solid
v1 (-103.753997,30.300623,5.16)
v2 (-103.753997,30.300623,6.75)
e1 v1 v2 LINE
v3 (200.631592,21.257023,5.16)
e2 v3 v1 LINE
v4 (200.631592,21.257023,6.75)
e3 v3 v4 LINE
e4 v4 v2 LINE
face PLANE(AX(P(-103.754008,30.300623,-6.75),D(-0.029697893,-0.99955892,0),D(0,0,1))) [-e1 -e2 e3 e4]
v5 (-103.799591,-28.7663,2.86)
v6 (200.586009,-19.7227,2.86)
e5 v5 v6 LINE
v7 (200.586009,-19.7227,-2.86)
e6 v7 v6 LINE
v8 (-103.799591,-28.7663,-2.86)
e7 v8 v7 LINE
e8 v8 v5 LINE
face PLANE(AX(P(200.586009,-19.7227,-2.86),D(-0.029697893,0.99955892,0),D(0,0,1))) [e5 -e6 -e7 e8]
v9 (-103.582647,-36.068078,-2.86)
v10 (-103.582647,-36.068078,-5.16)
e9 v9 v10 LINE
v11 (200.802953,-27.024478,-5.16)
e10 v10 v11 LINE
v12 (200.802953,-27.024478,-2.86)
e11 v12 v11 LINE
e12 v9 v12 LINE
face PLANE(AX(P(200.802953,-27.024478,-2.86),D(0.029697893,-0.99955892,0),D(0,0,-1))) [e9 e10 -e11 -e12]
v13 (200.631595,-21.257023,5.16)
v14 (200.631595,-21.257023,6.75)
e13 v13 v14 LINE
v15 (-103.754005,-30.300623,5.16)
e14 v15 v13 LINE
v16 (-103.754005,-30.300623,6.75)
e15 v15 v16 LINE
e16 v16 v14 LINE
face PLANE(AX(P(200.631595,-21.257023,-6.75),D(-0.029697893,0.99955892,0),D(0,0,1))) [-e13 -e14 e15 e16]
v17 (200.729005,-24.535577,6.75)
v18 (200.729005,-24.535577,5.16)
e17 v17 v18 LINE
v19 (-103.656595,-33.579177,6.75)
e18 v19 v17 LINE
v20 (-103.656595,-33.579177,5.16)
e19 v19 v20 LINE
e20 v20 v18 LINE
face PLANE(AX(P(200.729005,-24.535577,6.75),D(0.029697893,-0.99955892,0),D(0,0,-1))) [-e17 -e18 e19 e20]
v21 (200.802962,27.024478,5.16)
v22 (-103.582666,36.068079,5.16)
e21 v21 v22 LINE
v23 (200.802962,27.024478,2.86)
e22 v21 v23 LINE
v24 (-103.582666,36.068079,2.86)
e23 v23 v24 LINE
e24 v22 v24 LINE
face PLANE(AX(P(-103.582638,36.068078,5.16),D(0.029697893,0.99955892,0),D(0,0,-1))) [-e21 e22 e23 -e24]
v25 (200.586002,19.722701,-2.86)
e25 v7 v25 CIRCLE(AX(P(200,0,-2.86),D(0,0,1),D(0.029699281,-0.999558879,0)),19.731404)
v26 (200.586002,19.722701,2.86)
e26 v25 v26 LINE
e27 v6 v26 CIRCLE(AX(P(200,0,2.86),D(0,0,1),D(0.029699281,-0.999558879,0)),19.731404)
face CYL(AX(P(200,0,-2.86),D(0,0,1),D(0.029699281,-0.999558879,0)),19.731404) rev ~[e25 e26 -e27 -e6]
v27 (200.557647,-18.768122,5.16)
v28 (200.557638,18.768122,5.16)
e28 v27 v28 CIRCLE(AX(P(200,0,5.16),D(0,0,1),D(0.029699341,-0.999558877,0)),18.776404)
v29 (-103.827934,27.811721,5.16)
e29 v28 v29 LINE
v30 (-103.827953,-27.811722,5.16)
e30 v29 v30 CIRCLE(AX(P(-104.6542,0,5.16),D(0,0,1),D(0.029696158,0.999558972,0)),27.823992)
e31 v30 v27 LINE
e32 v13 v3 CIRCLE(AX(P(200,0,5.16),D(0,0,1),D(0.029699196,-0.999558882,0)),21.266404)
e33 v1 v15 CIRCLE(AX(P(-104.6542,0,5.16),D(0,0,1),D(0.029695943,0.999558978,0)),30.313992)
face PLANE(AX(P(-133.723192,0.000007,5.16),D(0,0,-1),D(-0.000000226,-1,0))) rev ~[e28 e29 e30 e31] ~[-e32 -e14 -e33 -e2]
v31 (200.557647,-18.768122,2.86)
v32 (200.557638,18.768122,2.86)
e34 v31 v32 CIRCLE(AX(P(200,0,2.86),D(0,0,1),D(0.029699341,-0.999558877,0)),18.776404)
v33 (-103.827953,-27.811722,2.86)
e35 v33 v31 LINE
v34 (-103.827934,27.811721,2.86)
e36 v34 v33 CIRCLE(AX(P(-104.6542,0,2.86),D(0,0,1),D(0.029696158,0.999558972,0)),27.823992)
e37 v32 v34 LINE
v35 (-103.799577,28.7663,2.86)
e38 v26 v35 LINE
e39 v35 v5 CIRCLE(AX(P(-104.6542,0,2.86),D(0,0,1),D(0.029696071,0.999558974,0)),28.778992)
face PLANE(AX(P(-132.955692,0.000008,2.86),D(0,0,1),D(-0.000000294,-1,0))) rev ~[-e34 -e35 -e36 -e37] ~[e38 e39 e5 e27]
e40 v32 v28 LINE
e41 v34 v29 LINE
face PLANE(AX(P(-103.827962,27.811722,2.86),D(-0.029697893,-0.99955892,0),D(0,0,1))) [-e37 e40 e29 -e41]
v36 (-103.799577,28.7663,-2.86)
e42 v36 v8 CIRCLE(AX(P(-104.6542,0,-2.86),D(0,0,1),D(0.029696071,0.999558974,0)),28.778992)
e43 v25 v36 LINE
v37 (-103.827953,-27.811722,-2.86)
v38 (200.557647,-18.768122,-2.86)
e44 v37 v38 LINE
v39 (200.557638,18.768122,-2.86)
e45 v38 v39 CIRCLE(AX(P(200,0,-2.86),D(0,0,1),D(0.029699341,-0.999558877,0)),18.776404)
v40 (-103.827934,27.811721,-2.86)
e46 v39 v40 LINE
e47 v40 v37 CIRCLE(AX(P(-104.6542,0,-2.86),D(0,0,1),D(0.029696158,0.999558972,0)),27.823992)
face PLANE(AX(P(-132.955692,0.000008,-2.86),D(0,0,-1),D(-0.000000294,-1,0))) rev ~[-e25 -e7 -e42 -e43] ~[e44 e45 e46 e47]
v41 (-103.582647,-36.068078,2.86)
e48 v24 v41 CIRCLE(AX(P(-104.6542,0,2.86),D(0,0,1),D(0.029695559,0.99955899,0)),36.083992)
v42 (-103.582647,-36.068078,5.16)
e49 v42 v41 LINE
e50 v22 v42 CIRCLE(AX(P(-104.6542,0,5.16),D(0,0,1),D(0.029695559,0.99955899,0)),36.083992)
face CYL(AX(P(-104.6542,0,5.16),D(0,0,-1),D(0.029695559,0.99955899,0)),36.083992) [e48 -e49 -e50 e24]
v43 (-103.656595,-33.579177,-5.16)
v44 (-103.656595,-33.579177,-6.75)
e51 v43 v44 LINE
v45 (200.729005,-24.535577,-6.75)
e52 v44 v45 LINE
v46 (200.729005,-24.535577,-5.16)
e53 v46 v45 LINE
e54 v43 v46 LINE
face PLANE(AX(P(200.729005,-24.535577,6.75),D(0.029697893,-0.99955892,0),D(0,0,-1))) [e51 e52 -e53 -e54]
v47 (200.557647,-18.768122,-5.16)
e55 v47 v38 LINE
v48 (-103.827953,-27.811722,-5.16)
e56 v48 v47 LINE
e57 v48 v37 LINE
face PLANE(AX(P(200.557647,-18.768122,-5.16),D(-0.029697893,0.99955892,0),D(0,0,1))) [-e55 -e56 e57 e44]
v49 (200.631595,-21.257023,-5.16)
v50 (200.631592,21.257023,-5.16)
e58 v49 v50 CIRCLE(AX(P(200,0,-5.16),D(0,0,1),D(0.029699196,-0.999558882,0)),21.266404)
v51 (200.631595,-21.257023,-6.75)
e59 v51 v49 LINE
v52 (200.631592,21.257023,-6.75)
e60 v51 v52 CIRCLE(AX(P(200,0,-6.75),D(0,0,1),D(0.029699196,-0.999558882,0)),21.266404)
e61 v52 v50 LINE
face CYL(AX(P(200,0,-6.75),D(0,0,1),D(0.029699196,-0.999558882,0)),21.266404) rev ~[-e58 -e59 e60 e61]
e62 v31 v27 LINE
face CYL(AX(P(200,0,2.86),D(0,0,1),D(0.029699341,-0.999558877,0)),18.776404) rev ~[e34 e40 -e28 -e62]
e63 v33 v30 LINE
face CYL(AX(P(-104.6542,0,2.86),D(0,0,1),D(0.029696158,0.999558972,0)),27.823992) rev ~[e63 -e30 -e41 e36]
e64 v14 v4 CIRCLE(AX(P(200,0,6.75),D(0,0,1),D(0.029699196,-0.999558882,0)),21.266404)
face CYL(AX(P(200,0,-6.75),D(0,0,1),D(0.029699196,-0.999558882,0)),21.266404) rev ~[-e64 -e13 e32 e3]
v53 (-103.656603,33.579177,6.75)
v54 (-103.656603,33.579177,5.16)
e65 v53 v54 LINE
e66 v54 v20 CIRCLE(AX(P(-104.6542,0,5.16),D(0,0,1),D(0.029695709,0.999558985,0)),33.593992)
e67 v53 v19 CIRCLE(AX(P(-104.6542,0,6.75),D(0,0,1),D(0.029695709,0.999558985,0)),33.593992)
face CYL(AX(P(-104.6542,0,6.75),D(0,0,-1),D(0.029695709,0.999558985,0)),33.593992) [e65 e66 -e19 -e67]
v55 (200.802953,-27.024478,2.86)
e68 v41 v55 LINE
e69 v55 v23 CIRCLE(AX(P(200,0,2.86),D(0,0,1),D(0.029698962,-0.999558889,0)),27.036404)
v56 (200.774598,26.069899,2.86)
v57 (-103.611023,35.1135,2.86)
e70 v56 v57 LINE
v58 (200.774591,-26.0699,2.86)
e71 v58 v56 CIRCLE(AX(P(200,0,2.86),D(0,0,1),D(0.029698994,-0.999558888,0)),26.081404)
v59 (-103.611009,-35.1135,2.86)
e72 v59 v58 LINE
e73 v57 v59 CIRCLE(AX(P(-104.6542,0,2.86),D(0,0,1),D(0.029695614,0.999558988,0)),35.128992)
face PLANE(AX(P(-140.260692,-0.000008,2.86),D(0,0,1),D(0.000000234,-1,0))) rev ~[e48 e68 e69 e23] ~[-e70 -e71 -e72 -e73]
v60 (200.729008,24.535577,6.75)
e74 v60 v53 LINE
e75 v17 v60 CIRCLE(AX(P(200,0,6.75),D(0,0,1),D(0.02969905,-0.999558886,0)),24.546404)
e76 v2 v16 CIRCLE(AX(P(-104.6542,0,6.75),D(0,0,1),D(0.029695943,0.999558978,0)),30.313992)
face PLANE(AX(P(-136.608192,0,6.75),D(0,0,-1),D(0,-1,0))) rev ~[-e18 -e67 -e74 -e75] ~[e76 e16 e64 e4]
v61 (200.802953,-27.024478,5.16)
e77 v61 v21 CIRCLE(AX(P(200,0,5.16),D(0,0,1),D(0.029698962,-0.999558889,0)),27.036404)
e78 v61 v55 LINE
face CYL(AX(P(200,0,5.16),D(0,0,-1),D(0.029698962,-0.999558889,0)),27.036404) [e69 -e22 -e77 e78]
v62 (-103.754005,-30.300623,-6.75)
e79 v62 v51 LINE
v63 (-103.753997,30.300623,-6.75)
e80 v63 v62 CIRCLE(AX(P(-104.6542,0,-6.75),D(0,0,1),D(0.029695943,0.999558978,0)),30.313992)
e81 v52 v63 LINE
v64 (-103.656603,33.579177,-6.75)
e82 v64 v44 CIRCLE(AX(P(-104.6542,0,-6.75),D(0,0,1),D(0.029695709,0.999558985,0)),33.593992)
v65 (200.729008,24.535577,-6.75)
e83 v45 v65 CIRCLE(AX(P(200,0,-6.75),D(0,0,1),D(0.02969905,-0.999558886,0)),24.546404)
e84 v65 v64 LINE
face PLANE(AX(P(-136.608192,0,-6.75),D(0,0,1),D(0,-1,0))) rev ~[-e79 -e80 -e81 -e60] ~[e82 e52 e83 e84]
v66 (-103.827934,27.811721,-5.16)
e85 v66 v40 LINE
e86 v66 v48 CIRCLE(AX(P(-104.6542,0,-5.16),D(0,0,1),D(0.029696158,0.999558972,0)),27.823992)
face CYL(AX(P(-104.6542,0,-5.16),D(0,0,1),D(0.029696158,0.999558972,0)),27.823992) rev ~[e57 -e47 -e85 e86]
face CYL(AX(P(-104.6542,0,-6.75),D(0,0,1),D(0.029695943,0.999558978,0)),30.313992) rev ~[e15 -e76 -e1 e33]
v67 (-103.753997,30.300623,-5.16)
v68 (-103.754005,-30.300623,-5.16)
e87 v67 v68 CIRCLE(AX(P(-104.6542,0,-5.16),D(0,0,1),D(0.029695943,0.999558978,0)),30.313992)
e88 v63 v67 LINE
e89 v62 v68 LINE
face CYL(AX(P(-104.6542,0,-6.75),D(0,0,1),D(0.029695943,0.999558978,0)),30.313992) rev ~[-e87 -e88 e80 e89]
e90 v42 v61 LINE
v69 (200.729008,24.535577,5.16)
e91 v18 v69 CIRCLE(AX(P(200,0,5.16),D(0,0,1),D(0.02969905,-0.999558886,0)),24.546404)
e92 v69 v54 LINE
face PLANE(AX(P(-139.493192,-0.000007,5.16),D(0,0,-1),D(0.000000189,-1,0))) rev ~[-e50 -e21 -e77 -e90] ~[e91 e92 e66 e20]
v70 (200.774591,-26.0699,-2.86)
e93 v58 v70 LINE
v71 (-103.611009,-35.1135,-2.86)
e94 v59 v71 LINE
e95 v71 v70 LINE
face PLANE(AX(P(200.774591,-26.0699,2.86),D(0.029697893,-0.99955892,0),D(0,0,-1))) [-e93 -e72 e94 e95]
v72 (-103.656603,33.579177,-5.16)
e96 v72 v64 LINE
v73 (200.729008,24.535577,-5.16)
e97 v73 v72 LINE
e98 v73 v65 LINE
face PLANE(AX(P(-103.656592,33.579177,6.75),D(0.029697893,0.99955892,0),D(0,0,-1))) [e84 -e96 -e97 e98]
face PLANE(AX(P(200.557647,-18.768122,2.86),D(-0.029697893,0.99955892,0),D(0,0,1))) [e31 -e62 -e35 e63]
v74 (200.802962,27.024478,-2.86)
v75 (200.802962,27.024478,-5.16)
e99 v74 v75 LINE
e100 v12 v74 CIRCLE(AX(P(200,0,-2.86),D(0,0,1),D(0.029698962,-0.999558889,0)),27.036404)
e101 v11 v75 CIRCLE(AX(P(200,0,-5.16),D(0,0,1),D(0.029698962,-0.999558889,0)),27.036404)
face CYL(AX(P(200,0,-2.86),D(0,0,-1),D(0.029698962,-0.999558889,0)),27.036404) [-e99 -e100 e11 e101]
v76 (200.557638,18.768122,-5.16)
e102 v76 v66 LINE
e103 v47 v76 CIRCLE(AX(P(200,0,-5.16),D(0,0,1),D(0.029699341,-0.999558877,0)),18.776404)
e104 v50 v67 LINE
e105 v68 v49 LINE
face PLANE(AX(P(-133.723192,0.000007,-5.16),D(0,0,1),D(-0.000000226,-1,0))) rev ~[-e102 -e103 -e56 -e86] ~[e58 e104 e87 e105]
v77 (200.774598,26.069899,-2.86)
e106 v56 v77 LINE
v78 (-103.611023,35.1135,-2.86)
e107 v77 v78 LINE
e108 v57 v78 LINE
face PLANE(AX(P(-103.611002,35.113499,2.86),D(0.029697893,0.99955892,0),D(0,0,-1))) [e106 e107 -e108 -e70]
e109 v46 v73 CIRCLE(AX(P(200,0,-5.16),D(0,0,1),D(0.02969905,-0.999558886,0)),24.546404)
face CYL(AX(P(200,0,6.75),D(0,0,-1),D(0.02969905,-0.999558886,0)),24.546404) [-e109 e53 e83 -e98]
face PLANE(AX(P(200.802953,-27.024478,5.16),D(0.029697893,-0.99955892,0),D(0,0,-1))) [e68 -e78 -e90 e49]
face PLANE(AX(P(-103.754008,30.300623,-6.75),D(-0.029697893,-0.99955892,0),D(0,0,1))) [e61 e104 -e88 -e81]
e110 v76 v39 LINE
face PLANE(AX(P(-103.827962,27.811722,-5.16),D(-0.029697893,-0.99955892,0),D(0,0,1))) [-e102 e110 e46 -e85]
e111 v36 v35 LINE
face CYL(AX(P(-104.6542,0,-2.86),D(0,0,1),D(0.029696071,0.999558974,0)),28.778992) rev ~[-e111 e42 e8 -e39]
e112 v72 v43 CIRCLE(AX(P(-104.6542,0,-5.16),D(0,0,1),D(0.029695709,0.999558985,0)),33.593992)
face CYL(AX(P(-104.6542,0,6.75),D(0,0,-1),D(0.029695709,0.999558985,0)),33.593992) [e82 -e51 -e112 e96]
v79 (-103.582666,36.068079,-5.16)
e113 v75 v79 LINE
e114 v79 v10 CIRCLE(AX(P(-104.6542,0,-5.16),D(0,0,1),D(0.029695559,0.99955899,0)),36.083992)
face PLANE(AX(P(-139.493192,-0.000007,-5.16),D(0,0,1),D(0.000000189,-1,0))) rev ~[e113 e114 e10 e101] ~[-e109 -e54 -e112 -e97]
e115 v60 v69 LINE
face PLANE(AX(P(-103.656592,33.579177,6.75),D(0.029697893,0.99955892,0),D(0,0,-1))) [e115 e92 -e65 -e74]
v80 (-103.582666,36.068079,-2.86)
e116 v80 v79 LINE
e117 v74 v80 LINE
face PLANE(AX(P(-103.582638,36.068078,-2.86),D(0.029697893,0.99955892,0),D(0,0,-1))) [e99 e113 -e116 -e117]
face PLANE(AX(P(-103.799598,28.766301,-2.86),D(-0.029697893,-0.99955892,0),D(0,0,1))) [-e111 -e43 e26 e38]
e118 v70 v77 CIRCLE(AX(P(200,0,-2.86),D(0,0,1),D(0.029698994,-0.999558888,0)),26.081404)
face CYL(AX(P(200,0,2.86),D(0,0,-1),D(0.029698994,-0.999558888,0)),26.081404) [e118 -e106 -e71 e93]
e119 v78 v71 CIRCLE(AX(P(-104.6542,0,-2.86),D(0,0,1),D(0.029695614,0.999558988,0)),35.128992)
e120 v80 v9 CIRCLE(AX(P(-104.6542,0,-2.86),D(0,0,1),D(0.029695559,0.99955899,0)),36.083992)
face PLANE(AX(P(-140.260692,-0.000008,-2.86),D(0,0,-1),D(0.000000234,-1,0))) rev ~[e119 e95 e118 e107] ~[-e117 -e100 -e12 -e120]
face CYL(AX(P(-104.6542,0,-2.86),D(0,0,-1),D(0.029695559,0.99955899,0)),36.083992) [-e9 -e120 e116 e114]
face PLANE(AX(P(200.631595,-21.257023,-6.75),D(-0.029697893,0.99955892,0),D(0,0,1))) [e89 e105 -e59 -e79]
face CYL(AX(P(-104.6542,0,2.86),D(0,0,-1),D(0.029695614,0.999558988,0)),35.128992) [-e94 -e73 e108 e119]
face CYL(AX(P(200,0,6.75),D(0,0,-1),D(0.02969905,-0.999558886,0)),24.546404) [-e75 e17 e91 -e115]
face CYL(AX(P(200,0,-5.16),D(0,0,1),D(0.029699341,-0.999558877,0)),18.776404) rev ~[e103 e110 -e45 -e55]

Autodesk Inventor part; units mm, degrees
ref_plane "Work Plane2" through (-104.6542, 0, 0) normal (-1, 0, 0) x (0, 0, 1)
ref_plane "Work Plane3" through (200, 0, 0) normal (-0.9133742, 0.4071211, 0) x (0, 0, 1)
sketch "Path" plane through (0, 0, 0) normal (0, 0, 1) x (1, 0, 0)
  arc A0 (-103.7053, 31.9399) -> (-103.7053, -31.9399) centre (-104.6542, 0) ccw
  arc A1 (200.6803, -22.8963) -> (200.6803, 22.8963) centre (200, 0) ccw
  line L0 (200.6803, -22.8963) -> (-103.7053, -31.9399)
  line L1 (-103.7053, 31.9399) -> (200.6803, 22.8963)
  dimension "d31" = 8.26
ref_plane "Section Plane" through (-103.7053, -31.9399, 0) normal (0.9995589, 0.0296981, 0) x (0, 0, 1)
sketch "Section Sketch" plane through (-103.7053, -31.9399, 0) normal (0.9995589, 0.0296981, 0) x (0, 0, 1)
  line L0 (-6.75, -1.64) -> (6.75, -1.64)
  line L1 (6.75, -1.64) -> (6.75, 1.64)
  line L2 (6.75, 1.64) -> (-6.75, 1.64)
  line L3 (-6.75, 1.64) -> (-6.75, -1.64)
  line L4 (-2.86, -3.175) -> (2.86, -3.175)
  line L5 (2.86, -3.175) -> (2.86, 3.175)
  line L6 (2.86, 3.175) -> (-2.86, 3.175)
  line L7 (-2.86, 3.175) -> (-2.86, -3.175)
  line L8 (-2.86, 0) -> (2.86, 0) construction
  line L9 (-5.16, -4.13) -> (-2.86, -4.13)
  line L10 (-2.86, -4.13) -> (-2.86, 4.13)
  line L11 (-2.86, 4.13) -> (-5.16, 4.13)
  line L12 (-5.16, 4.13) -> (-5.16, -4.13)
  line L13 (2.86, -4.13) -> (5.16, -4.13)
  line L14 (5.16, -4.13) -> (5.16, 4.13)
  line L15 (5.16, 4.13) -> (2.86, 4.13)
  line L16 (2.86, 4.13) -> (2.86, -4.13)
  line L17 (-6.75, 0) -> (6.75, 0) construction
  point P0 (0, 0)
  point P1 (0, 0)
  dimension "d21" = 3.28
  dimension "d22" = 6.35
  dimension "d23" = 5.72
  dimension "d24" = 2.3
  dimension "d31" = 8.26
  dimension "d32" = 13.5
sweep "Solid" add profiles "Section Sketch" path "Path"
pattern_of_one "Strand Pattern"
equation "\"d21\" = da_d2"
equation "\"d22\" = da_d1"
equation "\"d23\" = da_b1"
equation "\"d24\" = da_t1 + da_t2"
equation "\"d30\" = da_pt"
equation "\"da_p\" = 9.525"
equation "\"da_b1\" = 5.72"
equation "\"da_h2\" = 8.26"
equation "\"da_h3\" = 8.26"
equation "\"da_d1\" = 6.35"
equation "\"da_d2\" = 3.28"
equation "\"da_pt\" = 10.24"
equation "\"da_b\" = 13.5"
equation "\"da_t1\" = 1.3"
equation "\"da_t2\" = 1"
properties part number "Roller Chain"
